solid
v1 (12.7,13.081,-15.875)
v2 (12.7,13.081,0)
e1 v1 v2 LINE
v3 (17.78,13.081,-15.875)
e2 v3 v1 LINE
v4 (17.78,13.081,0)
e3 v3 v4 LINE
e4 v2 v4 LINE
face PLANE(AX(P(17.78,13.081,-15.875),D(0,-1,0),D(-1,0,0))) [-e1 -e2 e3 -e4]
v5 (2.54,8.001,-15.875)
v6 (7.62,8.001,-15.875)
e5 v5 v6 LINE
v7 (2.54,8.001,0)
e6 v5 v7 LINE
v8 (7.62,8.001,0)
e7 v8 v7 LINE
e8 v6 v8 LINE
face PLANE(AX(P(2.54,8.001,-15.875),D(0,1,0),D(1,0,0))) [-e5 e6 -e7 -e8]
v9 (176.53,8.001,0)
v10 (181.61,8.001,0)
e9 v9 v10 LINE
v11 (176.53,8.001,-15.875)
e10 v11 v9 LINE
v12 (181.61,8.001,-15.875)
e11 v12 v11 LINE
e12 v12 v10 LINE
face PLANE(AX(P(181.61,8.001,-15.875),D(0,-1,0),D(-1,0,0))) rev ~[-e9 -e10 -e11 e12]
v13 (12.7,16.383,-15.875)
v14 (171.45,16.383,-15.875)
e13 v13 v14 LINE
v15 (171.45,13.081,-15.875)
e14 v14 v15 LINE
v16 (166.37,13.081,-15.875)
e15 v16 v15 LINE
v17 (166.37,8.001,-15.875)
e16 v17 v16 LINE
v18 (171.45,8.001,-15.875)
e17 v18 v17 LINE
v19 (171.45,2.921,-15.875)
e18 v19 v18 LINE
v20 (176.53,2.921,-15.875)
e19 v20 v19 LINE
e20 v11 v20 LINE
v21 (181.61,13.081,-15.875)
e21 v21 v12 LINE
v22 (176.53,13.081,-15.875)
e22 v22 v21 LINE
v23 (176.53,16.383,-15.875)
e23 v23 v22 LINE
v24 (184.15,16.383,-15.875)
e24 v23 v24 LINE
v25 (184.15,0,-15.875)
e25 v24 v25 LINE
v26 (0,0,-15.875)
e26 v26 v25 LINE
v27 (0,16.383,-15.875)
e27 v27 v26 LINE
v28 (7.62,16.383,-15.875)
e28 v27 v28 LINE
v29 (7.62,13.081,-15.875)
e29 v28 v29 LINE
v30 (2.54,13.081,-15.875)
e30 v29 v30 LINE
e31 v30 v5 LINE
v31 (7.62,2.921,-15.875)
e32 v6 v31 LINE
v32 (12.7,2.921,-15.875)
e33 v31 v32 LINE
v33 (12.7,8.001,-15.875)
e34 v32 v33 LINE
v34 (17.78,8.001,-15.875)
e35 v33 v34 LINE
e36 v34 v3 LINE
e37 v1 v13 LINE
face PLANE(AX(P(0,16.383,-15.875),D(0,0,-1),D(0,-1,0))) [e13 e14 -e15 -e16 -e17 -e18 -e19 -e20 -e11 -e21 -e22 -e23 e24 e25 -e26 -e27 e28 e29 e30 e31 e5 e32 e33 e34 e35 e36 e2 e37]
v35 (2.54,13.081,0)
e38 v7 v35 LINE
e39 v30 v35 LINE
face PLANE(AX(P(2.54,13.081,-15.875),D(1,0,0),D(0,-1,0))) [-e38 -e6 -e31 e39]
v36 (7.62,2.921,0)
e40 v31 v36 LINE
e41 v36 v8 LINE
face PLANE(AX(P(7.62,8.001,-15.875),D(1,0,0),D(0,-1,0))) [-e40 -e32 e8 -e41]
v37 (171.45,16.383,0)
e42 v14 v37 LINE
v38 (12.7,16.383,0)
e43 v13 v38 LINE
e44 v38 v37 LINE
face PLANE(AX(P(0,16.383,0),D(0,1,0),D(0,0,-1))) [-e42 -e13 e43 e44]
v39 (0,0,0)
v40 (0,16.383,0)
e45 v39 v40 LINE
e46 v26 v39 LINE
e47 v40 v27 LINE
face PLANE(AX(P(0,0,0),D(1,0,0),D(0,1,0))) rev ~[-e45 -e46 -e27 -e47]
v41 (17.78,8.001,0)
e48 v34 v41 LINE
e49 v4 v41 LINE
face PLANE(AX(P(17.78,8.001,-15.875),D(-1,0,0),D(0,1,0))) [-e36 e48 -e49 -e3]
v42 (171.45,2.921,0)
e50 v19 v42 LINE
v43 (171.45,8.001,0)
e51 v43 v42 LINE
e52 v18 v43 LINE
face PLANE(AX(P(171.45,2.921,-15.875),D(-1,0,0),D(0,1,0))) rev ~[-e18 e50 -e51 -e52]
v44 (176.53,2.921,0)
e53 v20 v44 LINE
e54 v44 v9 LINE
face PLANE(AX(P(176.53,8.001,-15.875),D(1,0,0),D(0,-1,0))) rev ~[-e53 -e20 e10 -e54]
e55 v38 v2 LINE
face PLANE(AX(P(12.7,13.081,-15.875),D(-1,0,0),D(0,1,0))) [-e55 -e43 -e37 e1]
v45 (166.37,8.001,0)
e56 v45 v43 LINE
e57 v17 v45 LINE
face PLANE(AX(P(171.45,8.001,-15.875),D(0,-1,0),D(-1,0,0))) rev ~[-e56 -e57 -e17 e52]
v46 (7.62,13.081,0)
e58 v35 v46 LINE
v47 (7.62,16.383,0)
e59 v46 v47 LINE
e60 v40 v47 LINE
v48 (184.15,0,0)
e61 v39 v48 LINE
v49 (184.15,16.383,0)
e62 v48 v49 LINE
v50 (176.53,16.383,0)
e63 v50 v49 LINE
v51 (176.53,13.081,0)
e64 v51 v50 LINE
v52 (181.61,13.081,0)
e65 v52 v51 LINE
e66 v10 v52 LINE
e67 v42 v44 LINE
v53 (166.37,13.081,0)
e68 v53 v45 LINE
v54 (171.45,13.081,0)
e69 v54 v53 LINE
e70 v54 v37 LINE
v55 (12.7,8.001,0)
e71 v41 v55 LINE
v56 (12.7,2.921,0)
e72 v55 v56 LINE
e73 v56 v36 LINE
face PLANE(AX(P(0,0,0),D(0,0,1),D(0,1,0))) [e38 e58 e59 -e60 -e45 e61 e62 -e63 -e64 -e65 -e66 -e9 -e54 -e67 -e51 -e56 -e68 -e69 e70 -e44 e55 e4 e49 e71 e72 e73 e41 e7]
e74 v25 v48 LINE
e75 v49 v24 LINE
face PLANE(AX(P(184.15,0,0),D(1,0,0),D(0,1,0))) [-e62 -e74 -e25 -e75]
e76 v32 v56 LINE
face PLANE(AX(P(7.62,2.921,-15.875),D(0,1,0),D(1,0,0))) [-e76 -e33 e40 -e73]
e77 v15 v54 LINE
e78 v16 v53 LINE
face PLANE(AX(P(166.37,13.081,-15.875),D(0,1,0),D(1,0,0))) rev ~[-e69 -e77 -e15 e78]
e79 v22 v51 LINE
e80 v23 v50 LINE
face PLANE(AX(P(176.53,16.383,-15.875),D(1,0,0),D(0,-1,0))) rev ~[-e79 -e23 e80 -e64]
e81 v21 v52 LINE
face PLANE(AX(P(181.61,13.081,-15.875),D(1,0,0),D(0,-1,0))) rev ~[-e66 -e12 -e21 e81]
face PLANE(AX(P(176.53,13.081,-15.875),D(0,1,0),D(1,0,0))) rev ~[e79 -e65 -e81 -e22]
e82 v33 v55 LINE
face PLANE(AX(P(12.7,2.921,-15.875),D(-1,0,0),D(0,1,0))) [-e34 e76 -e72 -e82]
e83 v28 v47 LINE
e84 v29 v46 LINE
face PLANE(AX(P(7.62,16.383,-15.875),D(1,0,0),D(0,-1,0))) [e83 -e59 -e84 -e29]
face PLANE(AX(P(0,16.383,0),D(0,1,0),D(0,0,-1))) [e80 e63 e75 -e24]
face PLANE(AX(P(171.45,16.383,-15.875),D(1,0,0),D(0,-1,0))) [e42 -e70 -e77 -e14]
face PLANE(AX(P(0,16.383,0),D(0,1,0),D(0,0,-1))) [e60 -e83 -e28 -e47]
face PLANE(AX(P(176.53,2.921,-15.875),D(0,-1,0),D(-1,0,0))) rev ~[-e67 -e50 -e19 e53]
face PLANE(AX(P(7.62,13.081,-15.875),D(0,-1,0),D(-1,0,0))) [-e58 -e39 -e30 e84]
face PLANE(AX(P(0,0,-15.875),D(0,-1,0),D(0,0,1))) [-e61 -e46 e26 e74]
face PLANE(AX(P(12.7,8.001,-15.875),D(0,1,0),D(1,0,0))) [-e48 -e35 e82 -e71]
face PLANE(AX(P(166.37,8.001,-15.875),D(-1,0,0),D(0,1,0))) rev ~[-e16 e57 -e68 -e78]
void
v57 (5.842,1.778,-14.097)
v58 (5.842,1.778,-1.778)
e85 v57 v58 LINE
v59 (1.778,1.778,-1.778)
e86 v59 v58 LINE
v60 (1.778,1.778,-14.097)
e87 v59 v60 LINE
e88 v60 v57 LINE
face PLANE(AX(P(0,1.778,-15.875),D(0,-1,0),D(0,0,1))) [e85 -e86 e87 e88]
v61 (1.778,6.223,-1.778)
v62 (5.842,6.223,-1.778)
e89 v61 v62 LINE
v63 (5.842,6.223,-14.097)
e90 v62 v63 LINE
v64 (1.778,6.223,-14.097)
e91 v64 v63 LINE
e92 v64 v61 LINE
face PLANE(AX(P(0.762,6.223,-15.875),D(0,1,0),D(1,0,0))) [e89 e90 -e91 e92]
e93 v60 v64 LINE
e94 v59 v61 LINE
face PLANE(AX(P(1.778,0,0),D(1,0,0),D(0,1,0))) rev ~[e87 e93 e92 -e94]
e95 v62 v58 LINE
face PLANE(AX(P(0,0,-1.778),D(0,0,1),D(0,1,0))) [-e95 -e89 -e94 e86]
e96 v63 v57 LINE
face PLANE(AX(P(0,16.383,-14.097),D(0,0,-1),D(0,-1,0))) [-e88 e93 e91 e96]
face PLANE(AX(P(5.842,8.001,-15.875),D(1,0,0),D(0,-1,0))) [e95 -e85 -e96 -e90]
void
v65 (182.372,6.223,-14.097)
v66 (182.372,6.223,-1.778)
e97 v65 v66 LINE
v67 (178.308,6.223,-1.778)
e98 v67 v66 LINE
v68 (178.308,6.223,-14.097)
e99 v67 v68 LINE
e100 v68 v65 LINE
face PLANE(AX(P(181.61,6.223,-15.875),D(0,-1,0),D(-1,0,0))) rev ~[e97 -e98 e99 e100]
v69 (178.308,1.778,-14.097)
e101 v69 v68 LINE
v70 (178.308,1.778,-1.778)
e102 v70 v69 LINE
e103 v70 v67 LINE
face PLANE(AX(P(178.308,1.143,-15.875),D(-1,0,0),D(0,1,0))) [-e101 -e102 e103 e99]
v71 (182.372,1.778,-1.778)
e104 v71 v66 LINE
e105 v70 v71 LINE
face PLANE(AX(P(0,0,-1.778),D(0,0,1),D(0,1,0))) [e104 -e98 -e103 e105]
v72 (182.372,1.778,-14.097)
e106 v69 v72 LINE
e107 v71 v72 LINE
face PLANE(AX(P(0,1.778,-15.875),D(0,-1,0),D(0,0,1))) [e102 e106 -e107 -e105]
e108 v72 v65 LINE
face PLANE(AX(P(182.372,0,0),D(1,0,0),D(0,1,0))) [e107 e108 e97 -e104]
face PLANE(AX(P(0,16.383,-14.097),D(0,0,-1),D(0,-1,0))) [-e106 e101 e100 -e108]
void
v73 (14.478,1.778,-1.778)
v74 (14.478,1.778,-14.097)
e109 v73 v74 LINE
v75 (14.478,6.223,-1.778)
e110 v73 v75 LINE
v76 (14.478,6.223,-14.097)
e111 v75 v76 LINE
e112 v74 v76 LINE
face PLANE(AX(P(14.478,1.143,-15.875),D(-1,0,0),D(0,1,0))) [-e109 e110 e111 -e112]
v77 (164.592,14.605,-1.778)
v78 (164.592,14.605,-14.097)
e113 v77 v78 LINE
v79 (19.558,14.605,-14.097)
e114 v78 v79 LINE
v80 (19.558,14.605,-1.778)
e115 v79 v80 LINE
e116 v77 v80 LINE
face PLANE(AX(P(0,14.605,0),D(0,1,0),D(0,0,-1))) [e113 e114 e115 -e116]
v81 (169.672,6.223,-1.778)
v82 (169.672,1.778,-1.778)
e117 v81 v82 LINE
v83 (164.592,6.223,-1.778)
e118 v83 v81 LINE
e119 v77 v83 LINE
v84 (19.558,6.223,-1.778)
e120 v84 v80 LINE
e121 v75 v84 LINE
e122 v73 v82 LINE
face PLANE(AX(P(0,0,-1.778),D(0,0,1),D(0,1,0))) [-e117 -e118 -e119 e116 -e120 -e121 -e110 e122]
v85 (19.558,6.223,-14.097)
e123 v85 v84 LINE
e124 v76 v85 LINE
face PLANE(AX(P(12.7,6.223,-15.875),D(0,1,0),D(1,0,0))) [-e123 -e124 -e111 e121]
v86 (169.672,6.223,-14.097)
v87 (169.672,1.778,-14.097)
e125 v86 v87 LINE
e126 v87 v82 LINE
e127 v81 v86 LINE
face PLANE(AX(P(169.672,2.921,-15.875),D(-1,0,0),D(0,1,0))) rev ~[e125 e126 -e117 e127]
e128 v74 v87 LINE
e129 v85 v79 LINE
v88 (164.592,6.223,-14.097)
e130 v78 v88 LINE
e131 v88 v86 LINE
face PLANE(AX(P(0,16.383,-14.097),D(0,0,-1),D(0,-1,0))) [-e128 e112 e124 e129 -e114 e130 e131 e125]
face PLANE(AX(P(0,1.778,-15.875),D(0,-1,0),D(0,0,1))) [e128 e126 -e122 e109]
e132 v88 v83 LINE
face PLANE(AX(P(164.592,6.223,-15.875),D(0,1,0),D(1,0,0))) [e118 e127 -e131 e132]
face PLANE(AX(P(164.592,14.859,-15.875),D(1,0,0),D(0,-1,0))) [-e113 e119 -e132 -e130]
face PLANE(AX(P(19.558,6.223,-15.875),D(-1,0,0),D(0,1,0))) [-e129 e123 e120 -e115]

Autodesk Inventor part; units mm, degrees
ref_plane "YZ Plane" through (0, 0, 0) normal (1, 0, 0) x (0, 1, 0)
ref_plane "XZ Plane" through (0, 0, 0) normal (0, 1, 0) x (-1, 0, 0)
ref_plane "XY Plane" through (0, 0, 0) normal (0, 0, 1) x (1, 0, 0)
sketch "Sketch1" plane through (0, 0, 0) normal (1, 0, 0) x (0, 1, 0)
  line L0 (0, 0) -> (16.383, 0)
  line L1 (16.383, 0) -> (16.383, -15.875)
  line L2 (16.383, -15.875) -> (0, -15.875)
  line L3 (0, -15.875) -> (0, 0)
  dimension "d0" = 16.383
  dimension "d1" = 15.875
extrude "Extrusion1" add sketch "Sketch1" along normal blind 184.15
sketch "Sketch2" plane through (0, 0, -15.875) normal (0, 0, -1) x (-1, 0, 0)
  line L0 (-184.15, 16.383) -> (-184.15, 0) projected
  line L1 (-184.15, 16.383) -> (-176.53, 16.383)
  line L2 (0, 16.383) -> (-184.15, 16.383) projected
  line L3 (-176.53, 16.383) -> (-176.53, 13.081)
  line L4 (-176.53, 13.081) -> (-181.61, 13.081)
  line L5 (-181.61, 13.081) -> (-181.61, 8.001)
  line L6 (-181.61, 8.001) -> (-176.53, 8.001)
  line L7 (-176.53, 8.001) -> (-176.53, 2.921)
  line L8 (-176.53, 2.921) -> (-171.45, 2.921)
  line L9 (-171.45, 2.921) -> (-171.45, 8.001)
  line L10 (-171.45, 8.001) -> (-166.37, 8.001)
  line L11 (-166.37, 8.001) -> (-166.37, 13.081)
  line L12 (-166.37, 13.081) -> (-171.45, 13.081)
  line L13 (-171.45, 16.383) -> (-171.45, 13.081)
  line L14 (0, 16.383) -> (-7.62, 16.383)
  line L15 (-7.62, 16.383) -> (-7.62, 13.081)
  line L16 (-7.62, 13.081) -> (-2.54, 13.081)
  line L17 (-2.54, 13.081) -> (-2.54, 8.001)
  line L18 (-2.54, 8.001) -> (-7.62, 8.001)
  line L19 (-7.62, 8.001) -> (-7.62, 2.921)
  line L20 (-7.62, 2.921) -> (-12.7, 2.921)
  line L21 (-12.7, 2.921) -> (-12.7, 8.001)
  line L22 (-12.7, 8.001) -> (-17.78, 8.001)
  line L23 (-17.78, 8.001) -> (-17.78, 13.081)
  line L24 (-17.78, 13.081) -> (-12.7, 13.081)
  line L25 (-12.7, 13.081) -> (-12.7, 16.383)
  point P0 (0, 0)
  dimension "d4" = 7.62
  dimension "d5" = 3.302
  dimension "d6" = 5.08
  dimension "d7" = 5.08
  dimension "d8" = 5.08
  dimension "d9" = 5.08
  dimension "d10" = 5.08
  dimension "d11" = 7.62
  dimension "d12" = 3.302
  dimension "d13" = 5.08
  dimension "d14" = 5.08
  dimension "d15" = 5.08
extrude "Extrusion2" cut sketch "Sketch2" against normal blind 184.15
shell "Shell1" thickness 1.778 removed faces 0
properties part number "horzntalconnection"
